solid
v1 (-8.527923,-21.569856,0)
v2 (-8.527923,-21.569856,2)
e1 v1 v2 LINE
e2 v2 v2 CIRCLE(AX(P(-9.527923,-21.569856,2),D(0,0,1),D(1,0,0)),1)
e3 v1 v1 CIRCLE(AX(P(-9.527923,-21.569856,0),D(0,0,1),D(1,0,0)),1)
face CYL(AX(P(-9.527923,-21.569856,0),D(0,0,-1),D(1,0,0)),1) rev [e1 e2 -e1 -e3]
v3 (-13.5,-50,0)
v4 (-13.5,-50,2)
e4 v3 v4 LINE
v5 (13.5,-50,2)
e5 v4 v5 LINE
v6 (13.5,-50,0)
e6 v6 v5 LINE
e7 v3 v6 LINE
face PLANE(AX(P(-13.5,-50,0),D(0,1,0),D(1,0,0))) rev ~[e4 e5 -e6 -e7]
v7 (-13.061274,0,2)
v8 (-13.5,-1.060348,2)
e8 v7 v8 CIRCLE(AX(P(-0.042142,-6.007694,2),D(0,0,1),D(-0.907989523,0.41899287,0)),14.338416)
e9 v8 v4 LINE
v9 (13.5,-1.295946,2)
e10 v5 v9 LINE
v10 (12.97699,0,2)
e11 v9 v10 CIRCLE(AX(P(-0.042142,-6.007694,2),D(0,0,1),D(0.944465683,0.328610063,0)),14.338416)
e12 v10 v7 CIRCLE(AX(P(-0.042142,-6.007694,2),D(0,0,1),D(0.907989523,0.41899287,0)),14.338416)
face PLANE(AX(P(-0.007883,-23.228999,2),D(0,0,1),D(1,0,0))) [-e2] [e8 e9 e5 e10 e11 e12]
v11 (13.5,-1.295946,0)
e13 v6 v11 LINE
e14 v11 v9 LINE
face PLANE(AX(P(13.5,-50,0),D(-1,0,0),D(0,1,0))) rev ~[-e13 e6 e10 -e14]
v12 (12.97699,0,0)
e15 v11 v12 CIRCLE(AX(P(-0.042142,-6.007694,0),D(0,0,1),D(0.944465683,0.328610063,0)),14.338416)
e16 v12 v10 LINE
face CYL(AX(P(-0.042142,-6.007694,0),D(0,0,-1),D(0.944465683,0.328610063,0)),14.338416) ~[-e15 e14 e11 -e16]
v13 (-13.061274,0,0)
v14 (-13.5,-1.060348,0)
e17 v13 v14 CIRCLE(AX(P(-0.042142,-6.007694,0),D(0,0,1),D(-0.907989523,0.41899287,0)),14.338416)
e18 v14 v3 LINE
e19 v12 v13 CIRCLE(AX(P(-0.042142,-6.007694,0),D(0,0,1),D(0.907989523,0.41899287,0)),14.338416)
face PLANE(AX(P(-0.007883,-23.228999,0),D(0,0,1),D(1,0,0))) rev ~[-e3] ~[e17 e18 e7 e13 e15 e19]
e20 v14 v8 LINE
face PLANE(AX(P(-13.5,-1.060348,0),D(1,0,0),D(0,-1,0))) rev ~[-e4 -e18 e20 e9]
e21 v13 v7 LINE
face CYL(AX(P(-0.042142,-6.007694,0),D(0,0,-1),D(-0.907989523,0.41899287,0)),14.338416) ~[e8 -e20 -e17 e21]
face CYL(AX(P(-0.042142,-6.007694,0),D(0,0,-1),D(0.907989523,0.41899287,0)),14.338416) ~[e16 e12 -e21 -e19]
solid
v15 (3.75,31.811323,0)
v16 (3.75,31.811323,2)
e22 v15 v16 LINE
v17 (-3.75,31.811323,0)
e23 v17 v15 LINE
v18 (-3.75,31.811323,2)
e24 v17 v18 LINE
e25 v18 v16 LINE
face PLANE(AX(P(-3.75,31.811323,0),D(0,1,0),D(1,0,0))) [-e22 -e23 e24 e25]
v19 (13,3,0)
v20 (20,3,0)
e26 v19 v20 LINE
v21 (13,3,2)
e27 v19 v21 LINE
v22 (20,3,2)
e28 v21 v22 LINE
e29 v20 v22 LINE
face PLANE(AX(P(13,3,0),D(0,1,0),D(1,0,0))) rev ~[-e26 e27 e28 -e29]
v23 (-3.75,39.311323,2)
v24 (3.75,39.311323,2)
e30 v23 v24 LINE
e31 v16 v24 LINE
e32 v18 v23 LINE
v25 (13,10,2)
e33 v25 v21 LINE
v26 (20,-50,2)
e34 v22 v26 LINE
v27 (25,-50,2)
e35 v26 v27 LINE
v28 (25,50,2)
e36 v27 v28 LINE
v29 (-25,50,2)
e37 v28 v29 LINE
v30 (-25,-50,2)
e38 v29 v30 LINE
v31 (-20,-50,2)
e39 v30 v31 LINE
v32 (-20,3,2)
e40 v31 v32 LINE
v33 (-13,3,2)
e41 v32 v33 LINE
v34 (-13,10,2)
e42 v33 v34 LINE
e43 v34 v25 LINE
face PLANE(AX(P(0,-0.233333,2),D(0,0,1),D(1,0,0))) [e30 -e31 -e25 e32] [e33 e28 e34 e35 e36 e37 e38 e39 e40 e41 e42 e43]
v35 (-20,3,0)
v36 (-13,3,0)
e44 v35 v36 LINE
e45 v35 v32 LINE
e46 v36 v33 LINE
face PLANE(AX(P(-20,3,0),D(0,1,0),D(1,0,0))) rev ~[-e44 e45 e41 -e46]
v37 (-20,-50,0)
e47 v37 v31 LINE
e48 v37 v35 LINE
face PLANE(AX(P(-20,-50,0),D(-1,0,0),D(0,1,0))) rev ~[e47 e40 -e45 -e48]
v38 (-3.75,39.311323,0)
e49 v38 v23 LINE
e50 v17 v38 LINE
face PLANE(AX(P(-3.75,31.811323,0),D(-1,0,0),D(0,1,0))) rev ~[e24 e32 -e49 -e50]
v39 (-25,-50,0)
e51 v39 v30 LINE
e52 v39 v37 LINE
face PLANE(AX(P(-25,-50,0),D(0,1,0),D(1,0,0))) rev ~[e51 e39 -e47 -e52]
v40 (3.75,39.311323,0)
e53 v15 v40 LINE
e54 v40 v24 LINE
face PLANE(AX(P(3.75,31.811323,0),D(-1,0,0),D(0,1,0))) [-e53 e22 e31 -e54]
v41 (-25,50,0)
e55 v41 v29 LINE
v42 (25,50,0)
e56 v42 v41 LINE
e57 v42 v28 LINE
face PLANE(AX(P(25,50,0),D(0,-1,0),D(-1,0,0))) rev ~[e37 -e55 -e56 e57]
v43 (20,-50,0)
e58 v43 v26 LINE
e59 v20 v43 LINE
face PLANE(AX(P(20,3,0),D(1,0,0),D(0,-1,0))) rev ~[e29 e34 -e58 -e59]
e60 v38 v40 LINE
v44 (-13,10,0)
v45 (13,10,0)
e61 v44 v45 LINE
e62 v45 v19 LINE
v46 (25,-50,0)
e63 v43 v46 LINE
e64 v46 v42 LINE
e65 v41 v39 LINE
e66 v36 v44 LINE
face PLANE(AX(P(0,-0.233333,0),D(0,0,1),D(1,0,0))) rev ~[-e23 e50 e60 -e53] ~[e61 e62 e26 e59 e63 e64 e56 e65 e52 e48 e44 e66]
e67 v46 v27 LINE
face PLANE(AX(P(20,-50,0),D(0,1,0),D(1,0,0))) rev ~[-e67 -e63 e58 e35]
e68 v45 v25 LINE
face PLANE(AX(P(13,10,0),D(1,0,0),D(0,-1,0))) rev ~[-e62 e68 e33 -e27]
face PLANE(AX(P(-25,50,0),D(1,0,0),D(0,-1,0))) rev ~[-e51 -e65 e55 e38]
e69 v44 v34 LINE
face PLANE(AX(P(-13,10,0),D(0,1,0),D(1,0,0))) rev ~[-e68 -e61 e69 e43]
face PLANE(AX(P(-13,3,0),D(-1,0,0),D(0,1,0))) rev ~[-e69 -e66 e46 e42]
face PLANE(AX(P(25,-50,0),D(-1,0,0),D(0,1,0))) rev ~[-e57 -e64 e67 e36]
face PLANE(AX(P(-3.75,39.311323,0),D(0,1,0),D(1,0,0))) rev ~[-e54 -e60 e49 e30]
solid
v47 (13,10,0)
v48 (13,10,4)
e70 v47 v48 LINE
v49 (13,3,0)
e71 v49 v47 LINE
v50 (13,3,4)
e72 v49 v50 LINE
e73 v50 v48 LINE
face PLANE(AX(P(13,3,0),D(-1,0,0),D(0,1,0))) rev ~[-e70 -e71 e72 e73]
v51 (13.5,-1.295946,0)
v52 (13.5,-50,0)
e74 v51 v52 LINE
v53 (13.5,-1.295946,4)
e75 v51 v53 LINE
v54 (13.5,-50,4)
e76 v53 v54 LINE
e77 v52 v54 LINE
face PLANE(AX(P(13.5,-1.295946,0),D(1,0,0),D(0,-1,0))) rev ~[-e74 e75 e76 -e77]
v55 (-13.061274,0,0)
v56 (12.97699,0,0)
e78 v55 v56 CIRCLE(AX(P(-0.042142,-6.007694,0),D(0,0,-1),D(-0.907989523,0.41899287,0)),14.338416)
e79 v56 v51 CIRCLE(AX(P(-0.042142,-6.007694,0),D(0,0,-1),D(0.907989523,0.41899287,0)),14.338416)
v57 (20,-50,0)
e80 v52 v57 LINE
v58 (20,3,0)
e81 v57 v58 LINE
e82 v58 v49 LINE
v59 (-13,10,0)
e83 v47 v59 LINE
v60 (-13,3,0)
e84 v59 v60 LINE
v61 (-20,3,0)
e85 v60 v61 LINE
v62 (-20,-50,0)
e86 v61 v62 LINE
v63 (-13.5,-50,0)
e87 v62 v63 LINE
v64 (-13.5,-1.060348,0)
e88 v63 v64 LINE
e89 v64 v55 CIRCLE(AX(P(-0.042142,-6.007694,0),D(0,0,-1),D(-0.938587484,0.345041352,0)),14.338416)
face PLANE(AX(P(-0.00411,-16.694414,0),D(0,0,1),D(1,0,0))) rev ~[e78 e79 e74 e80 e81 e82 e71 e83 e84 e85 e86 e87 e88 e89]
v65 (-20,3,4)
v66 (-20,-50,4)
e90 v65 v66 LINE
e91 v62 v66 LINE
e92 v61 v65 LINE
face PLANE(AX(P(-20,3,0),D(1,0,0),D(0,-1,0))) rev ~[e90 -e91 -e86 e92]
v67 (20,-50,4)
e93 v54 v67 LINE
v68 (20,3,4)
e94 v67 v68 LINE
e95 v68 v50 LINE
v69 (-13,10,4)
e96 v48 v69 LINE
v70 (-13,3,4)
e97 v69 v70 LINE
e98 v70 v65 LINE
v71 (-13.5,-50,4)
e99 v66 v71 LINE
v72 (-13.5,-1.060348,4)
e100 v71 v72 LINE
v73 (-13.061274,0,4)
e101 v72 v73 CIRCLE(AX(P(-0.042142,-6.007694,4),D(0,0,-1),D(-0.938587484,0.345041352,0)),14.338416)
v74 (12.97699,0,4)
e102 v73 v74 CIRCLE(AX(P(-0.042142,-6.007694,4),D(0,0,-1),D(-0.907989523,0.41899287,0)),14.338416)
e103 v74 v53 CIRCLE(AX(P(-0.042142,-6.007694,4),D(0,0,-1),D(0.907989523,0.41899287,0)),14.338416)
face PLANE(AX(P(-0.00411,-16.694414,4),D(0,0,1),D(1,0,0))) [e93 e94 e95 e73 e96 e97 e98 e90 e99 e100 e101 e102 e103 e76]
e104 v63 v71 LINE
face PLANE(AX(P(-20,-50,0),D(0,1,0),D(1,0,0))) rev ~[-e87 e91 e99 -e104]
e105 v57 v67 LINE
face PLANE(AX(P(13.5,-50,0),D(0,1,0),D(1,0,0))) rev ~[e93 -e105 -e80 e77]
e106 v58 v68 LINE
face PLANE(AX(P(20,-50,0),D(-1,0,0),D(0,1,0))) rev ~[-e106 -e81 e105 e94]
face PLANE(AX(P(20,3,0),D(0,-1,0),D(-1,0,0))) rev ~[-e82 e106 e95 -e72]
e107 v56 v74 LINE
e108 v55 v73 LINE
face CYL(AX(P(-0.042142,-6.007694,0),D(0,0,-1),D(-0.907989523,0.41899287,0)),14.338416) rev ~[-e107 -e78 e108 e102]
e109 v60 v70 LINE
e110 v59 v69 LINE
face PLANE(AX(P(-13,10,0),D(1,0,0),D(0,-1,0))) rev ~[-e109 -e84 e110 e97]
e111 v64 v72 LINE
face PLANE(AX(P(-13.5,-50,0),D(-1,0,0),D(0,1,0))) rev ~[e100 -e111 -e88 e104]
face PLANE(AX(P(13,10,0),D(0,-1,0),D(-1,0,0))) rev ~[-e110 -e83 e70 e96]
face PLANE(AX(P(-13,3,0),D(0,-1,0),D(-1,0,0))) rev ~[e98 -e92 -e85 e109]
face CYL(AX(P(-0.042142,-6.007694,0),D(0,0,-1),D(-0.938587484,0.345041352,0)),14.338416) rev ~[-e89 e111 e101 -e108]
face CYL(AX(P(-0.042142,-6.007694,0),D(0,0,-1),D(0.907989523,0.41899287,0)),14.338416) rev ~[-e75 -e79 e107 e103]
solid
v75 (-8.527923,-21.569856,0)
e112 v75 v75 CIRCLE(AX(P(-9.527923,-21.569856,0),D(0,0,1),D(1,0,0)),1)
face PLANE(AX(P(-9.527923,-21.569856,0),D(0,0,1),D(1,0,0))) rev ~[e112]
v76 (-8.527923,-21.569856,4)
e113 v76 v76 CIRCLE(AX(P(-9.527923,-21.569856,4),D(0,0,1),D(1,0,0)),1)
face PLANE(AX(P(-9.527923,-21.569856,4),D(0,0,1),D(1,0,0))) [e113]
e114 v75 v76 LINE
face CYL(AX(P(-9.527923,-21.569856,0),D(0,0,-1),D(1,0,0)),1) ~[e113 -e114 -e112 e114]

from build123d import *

# Parameters (mm, degrees)
F0_W     = 7.5
F0_H     = 7.5
F1_DEPTH = 2
F0_R     = 1
F2_DEPTH = 4


# Not quite as in the source:
# - a feature names something its author has since deleted; it is built from what else it names


with BuildPart() as f1:
    # F0 (on Top) → F1 (new body)
    with BuildSketch(Plane.XY):
        Polygon((25, -50), (25, 50), (-25, 50), (-25, -50), (-20, -50), (-20, 3), (-13, 3), (-13, 10), (-12.8840403631, 10), (13, 10), (13, 3), (20, 3), (20, -50), align=None)
        with Locations((0, 35.5613231659)):
            Rectangle(F0_W, F0_H, mode=Mode.SUBTRACT)
    extrude(amount=F1_DEPTH)


with BuildPart() as f1b:
    # F0 (on Top) → F1, piece 2 (new body)
    with BuildSketch(Plane.XY):
        with BuildLine():
            Line((-13.5, -50), (13.5, -50))
            Line((13.5, -50), (13.5, -1.2959463056))
            ThreePointArc((13.5, -1.2959463056), (13.2542929953, -0.641597419), (12.9769896425, 0))
            ThreePointArc((12.9769896425, 0), (-0.0421420295, 8.3307220269), (-13.0612737015, 0))
            ThreePointArc((-13.0612737015, 0), (-13.2912487699, -0.5257830712), (-13.5, -1.0603476549))
            Line((-13.5, -1.0603476549), (-13.5, -50))
        make_face()
        with Locations((-9.527922608, -21.5698555112)):
            Circle(F0_R, mode=Mode.SUBTRACT)
    extrude(amount=F1_DEPTH)


with BuildPart() as f2:
    # F0 (on Top) → F2 (new body)
    with BuildSketch(Plane.XY):
        with BuildLine():
            Line((13.5, -50), (20, -50))
            Line((20, -50), (20, 3))
            Line((20, 3), (13, 3))
            Line((13, 3), (13, 10))
            Line((13, 10), (-12.8840403631, 10))
            Line((-12.8840403631, 10), (-13, 10))
            Line((-13, 10), (-13, 3))
            Line((-13, 3), (-20, 3))
            Line((-20, 3), (-20, -50))
            Line((-20, -50), (-13.5, -50))
            Line((-13.5, -50), (-13.5, -1.0603476549))
            ThreePointArc((-13.5, -1.0603476549), (-13.2912487699, -0.5257830712), (-13.0612737015, 0))
            ThreePointArc((-13.0612737015, 0), (-0.0421420295, 8.3307220269), (12.9769896425, 0))
            ThreePointArc((12.9769896425, 0), (13.2542929953, -0.641597419), (13.5, -1.2959463056))
            Line((13.5, -1.2959463056), (13.5, -50))
        make_face()
    extrude(amount=F2_DEPTH)


with BuildPart() as f2b:
    # F0 (on Top) → F2, piece 2 (new body)
    with BuildSketch(Plane.XY):
        with Locations((-9.527922608, -21.5698555112)):
            Circle(F0_R)
    extrude(amount=F2_DEPTH)


solid = Compound([f1.part, f1b.part, f2.part, f2b.part])
